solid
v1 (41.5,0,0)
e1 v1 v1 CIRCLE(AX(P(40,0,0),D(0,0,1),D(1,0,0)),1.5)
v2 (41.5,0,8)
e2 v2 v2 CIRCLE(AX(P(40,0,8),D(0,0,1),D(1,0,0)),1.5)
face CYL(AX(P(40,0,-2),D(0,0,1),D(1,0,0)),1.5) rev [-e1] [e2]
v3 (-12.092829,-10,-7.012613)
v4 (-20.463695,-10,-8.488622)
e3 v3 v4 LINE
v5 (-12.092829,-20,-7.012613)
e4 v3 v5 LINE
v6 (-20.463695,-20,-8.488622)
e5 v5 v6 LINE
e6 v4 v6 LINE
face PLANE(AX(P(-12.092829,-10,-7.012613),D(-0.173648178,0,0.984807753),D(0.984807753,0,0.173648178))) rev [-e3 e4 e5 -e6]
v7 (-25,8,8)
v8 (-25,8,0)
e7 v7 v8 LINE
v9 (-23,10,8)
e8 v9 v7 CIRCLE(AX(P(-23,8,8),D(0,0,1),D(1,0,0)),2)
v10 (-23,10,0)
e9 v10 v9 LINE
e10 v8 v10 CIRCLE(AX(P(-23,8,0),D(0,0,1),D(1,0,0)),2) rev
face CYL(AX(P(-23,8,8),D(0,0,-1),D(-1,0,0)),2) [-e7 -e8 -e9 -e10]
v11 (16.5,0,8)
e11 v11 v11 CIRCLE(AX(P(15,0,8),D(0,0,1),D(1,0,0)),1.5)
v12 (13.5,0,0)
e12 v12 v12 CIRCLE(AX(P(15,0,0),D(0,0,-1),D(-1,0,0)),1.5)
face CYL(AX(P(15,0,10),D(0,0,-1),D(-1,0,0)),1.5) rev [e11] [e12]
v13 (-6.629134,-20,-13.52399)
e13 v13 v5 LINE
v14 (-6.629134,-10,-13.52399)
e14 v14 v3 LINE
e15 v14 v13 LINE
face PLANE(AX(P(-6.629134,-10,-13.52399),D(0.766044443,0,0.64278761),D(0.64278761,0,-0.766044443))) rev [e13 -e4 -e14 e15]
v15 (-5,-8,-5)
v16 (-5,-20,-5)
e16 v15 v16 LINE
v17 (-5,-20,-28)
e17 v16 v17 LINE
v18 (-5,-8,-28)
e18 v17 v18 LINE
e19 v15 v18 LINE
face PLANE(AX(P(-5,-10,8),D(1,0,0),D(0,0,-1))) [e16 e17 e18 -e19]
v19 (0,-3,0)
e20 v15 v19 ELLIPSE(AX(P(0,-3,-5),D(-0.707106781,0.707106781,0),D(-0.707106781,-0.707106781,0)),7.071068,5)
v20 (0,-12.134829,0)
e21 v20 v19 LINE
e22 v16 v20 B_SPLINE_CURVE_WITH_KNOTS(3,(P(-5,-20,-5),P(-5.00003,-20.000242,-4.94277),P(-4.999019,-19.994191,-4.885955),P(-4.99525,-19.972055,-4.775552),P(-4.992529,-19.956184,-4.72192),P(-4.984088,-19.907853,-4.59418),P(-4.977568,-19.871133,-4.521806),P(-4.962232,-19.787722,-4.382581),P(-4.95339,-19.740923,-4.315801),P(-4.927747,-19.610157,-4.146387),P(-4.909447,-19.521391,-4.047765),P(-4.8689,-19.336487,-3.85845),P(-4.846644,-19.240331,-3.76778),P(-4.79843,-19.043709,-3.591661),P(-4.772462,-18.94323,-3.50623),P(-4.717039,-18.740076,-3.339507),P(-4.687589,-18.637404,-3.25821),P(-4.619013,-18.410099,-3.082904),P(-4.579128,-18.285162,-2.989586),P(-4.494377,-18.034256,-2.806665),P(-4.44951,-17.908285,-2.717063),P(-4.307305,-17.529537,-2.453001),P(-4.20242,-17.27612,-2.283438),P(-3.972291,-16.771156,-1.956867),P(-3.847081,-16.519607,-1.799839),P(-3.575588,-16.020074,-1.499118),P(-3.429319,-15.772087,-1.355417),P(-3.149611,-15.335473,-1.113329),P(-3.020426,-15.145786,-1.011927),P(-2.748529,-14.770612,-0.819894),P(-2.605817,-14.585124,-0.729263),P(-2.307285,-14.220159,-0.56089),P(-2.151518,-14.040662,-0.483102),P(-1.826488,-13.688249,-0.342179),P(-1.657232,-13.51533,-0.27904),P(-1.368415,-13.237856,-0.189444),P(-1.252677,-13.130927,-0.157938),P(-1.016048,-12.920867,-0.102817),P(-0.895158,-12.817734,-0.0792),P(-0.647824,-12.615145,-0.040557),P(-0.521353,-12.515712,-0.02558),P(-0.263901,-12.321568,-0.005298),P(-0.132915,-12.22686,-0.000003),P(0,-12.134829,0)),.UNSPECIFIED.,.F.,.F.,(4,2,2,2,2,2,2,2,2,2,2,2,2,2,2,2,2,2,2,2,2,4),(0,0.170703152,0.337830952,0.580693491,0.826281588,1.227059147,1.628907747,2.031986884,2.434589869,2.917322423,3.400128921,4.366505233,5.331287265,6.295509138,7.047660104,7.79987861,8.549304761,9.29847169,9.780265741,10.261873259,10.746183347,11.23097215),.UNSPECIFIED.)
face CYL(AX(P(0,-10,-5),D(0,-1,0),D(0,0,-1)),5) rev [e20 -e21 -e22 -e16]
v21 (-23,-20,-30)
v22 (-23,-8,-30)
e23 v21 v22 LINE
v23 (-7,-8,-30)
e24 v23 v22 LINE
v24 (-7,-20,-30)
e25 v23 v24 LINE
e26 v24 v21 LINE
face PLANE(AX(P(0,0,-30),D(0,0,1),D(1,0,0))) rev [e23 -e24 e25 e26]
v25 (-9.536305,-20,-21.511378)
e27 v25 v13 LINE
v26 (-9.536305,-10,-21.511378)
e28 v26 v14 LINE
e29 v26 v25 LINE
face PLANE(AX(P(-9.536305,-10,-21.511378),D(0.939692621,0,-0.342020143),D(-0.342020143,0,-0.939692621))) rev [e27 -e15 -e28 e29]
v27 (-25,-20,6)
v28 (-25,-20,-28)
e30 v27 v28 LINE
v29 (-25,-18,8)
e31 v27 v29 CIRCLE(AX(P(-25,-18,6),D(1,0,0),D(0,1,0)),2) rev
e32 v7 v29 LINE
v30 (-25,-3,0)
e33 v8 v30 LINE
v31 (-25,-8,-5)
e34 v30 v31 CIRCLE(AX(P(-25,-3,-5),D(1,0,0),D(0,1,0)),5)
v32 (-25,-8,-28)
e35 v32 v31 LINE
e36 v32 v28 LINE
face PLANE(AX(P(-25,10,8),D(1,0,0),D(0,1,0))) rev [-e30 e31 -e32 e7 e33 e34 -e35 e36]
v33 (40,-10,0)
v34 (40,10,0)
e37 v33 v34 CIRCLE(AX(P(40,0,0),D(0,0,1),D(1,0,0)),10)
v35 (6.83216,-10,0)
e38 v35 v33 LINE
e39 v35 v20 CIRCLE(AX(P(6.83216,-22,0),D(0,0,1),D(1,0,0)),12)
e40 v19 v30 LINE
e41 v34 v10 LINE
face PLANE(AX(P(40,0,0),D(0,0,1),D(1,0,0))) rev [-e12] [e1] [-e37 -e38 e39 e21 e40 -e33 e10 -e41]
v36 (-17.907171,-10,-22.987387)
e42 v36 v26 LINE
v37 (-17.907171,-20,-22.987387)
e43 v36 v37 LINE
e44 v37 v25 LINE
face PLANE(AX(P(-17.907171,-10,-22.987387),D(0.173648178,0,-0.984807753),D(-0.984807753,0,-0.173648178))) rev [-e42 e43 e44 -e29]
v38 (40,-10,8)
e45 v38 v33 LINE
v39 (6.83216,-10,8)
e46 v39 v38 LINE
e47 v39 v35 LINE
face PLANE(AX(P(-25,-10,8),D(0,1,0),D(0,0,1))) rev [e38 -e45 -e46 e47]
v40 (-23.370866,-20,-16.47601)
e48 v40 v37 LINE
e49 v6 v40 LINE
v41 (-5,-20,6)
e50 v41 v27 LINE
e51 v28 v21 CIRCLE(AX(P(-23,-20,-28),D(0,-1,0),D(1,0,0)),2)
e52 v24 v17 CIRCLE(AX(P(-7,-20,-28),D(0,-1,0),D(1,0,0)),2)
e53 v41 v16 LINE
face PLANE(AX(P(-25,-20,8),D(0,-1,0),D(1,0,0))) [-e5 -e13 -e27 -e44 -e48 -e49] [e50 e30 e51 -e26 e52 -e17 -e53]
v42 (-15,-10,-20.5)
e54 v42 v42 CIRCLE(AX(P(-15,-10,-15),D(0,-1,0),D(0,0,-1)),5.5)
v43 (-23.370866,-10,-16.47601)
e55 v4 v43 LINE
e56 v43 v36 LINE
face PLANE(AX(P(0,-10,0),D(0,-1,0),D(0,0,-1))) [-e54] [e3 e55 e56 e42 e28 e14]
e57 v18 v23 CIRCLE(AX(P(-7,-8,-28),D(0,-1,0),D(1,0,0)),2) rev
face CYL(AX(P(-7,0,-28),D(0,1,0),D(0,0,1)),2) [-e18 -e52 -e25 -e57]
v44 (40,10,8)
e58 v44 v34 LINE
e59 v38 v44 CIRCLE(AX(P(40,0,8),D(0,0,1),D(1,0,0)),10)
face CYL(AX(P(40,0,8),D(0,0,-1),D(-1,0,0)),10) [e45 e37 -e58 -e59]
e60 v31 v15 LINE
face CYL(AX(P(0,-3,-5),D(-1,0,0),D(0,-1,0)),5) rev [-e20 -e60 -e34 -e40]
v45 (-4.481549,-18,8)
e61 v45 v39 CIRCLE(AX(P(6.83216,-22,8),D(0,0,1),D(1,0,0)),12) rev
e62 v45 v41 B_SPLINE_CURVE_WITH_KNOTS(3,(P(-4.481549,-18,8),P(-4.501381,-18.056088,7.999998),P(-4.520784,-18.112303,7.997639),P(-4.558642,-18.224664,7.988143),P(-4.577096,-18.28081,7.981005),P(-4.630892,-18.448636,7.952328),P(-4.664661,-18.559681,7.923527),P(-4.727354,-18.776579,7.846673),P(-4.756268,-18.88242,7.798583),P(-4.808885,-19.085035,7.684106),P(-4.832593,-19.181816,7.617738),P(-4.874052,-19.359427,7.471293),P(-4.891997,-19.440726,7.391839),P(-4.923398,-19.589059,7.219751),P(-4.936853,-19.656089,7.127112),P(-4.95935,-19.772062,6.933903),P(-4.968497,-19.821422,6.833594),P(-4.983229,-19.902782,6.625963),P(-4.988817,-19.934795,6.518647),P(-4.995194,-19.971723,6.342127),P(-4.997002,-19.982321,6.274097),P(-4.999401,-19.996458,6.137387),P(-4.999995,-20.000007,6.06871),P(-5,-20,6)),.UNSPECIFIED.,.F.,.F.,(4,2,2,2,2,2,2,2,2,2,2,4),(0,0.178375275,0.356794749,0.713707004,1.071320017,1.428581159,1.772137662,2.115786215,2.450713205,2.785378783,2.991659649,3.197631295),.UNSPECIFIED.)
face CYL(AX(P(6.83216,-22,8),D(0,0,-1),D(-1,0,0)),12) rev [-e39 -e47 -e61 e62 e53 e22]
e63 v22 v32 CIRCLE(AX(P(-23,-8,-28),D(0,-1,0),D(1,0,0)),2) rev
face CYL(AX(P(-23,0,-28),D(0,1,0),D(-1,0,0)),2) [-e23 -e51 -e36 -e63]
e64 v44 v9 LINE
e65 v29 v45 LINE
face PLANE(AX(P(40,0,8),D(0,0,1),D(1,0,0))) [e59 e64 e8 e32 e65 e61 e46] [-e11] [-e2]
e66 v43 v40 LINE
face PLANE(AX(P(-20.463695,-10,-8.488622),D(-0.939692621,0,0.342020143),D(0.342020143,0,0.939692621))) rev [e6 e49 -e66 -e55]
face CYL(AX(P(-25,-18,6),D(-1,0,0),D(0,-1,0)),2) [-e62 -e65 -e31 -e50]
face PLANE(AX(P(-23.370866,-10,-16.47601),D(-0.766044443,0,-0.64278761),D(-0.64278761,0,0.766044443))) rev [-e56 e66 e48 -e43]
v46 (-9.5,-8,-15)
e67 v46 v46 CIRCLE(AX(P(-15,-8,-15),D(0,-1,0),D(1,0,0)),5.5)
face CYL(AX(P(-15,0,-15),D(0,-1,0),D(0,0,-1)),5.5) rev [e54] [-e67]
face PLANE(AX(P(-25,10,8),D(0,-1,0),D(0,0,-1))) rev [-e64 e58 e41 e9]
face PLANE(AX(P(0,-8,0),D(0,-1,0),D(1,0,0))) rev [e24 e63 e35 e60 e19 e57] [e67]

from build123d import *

# Parameters (mm, degrees)
BOSS_EXTRUDE1_DEPTH      = 8
SKETCH2_R                = 1.5
CUT_EXTRUDE1_DEPTH       = 10
SKETCH3_R                = 1.5
CUT_EXTRUDE2_DEPTH       = 10
BOSS_EXTRUDE3_DEPTH      = 30
BOSS_EXTRUDE3_DEPTH_BACK = 8
SKETCH6_W                = 20
SKETCH6_H                = 10
FILLET3_R                = 12
SKETCH7_W                = 20
SKETCH7_H                = 30
BOSS_EXTRUDE4_DEPTH      = 2
CUT_EXTRUDE3_DEPTH       = 10
SKETCH9_R                = 5.5
CUT_EXTRUDE4_DEPTH       = 10
FILLET4_R                = 5
FILLET5_R                = 2


with BuildPart() as part:
    # Sketch1 → Boss-Extrude1 (new body)
    with BuildSketch(Plane.XY):
        with BuildLine():
            Line((-25, 10), (40, 10))
            ThreePointArc((40, 10), (50, 0), (40, -10))
            Line((40, -10), (-25, -10))
            Line((-25, -10), (-25, 10))
        make_face()
    extrude(amount=BOSS_EXTRUDE1_DEPTH)

    # Sketch2 → Cut-Extrude1 (cut)
    with BuildSketch(Plane.XY.offset(8)):
        with Locations((40, 0)):
            Circle(SKETCH2_R)
    extrude(amount=-CUT_EXTRUDE1_DEPTH, mode=Mode.SUBTRACT)

    # Sketch3 → Cut-Extrude2 (cut)
    with BuildSketch(Plane(origin=(0, 0, 0), x_dir=(-1, 0, 0), z_dir=(0, 0, -1))):
        with Locations((-15, 0)):
            Circle(SKETCH3_R)
    extrude(amount=-CUT_EXTRUDE2_DEPTH, mode=Mode.SUBTRACT)

    # Sketch6 → Boss-Extrude3 (add, two sides: drawn at the far end of the back side and taken through both)
    with BuildSketch(Plane(origin=(0, 0, 0), x_dir=(-1, 0, 0), z_dir=(0, 0, -1)).offset(-BOSS_EXTRUDE3_DEPTH_BACK)):
        with Locations((15, -15)):
            Rectangle(SKETCH6_W, SKETCH6_H)
    extrude(amount=BOSS_EXTRUDE3_DEPTH + BOSS_EXTRUDE3_DEPTH_BACK)

    # Fillet3
    # the kernel refuses this fillet: 12 mm, written as the material it adds along each edge
    with BuildSketch(Plane(origin=(-5, -10, 8), x_dir=(0, -1, 0), z_dir=(0, 0, -1))) as fillet3_piece_1:
        with BuildLine():
            CenterArc((12, -11.832159566), FILLET3_R, 99.594068227, 80.405931773)
            Line((0, -11.832159566), (0, 0))
            Line((0, 0), (10, 0))
        make_face()
    extrude(amount=8)

    # Sketch7 → Boss-Extrude4 (add)
    with BuildSketch(Plane(origin=(0, -10, 0), x_dir=(1, 0, 0), z_dir=(0, 1, 0))):
        with Locations((-15, 15)):
            Rectangle(SKETCH7_W, SKETCH7_H)
    extrude(amount=BOSS_EXTRUDE4_DEPTH)

    # Sketch8 → Cut-Extrude3 (cut)
    with BuildSketch(Plane.XZ.offset(20)):
        Polygon((-12.092828782, -7.012612723), (-20.463694682, -8.488622233), (-23.370865901, -16.47600951), (-17.907171218, -22.987387277), (-9.536305318, -21.511377767), (-6.629134099, -13.52399049), align=None)
    extrude(amount=-CUT_EXTRUDE3_DEPTH, mode=Mode.SUBTRACT)

    # Sketch9 → Cut-Extrude4 (cut)
    with BuildSketch(Plane.XZ.offset(10)):
        with Locations(Location((-15, -15, 0), (0, 0, 270))):
            Circle(SKETCH9_R)
    extrude(amount=-CUT_EXTRUDE4_DEPTH, mode=Mode.SUBTRACT)

    # Fillet4
    # the kernel refuses this fillet: 5 mm, written as the material it adds along each edge
    with BuildSketch(Plane(origin=(-5, -20, 0), x_dir=(1, 0, 0), z_dir=(0, 1, 0))) as fillet4_piece_1_section:
        with BuildLine():
            CenterArc((FILLET4_R, FILLET4_R), FILLET4_R, 180, 90)
            Line((0, FILLET4_R), (0, 0))
            Line((0, 0), (FILLET4_R, 0))
        make_face()
    fillet4_piece_1 = extrude(amount=12, mode=Mode.PRIVATE)
    fillet4_piece_1 = fillet4_piece_1 - Plane(origin=(6.832159566, -22, 0), x_dir=(0, -1, 0), z_dir=(0, 0, 1)) * Cylinder(12, 44, mode=Mode.PRIVATE)
    add(fillet4_piece_1)
    with BuildSketch(Plane(origin=(-25, -8, 0), x_dir=(0, 1, 0), z_dir=(1, 0, 0))) as fillet4_piece_2:
        with BuildLine():
            CenterArc((FILLET4_R, -FILLET4_R), FILLET4_R, 90, 90)
            Line((0, -FILLET4_R), (0, 0))
            Line((0, 0), (FILLET4_R, 0))
        make_face()
    extrude(amount=20)
    with BuildSketch(Plane(origin=(-5, -20, 0), x_dir=(1, 0, 0), z_dir=(0, 1, 0))) as fillet4_piece_3a_section:
        with BuildLine():
            CenterArc((FILLET4_R, FILLET4_R), FILLET4_R, 180, 90)
            Line((0, FILLET4_R), (0, 0))
            Line((0, 0), (FILLET4_R, 0))
        make_face()
    fillet4_piece_3a = extrude(amount=24.5, mode=Mode.PRIVATE)
    fillet4_piece_3a = split(fillet4_piece_3a, bisect_by=Plane(origin=(-5, -8, 0), z_dir=(0, 1, 0)), keep=Keep.TOP, mode=Mode.PRIVATE)
    with BuildSketch(Plane(origin=(-25, -8, 0), x_dir=(0, 1, 0), z_dir=(1, 0, 0))) as fillet4_piece_3b_section:
        with BuildLine():
            CenterArc((FILLET4_R, -FILLET4_R), FILLET4_R, 90, 90)
            Line((0, -FILLET4_R), (0, 0))
            Line((0, 0), (FILLET4_R, 0))
        make_face()
    fillet4_piece_3b = extrude(amount=32.5, mode=Mode.PRIVATE)
    fillet4_piece_3b = split(fillet4_piece_3b, bisect_by=Plane(origin=(-5, -8, 0), z_dir=(1, 0, 0)), keep=Keep.TOP, mode=Mode.PRIVATE)
    fillet4_piece_3 = fillet4_piece_3a & fillet4_piece_3b
    add(fillet4_piece_3)

    # Fillet5
    fillet5_edges = [part.edges().sort_by_distance(p)[0] for p in [
        (-15, -20, 8),
        (-25, -14, -30),
        (-5, -14, -30),
        (-25, 10, 4),
    ]]
    fillet(fillet5_edges, radius=FILLET5_R)


solid = part.part
